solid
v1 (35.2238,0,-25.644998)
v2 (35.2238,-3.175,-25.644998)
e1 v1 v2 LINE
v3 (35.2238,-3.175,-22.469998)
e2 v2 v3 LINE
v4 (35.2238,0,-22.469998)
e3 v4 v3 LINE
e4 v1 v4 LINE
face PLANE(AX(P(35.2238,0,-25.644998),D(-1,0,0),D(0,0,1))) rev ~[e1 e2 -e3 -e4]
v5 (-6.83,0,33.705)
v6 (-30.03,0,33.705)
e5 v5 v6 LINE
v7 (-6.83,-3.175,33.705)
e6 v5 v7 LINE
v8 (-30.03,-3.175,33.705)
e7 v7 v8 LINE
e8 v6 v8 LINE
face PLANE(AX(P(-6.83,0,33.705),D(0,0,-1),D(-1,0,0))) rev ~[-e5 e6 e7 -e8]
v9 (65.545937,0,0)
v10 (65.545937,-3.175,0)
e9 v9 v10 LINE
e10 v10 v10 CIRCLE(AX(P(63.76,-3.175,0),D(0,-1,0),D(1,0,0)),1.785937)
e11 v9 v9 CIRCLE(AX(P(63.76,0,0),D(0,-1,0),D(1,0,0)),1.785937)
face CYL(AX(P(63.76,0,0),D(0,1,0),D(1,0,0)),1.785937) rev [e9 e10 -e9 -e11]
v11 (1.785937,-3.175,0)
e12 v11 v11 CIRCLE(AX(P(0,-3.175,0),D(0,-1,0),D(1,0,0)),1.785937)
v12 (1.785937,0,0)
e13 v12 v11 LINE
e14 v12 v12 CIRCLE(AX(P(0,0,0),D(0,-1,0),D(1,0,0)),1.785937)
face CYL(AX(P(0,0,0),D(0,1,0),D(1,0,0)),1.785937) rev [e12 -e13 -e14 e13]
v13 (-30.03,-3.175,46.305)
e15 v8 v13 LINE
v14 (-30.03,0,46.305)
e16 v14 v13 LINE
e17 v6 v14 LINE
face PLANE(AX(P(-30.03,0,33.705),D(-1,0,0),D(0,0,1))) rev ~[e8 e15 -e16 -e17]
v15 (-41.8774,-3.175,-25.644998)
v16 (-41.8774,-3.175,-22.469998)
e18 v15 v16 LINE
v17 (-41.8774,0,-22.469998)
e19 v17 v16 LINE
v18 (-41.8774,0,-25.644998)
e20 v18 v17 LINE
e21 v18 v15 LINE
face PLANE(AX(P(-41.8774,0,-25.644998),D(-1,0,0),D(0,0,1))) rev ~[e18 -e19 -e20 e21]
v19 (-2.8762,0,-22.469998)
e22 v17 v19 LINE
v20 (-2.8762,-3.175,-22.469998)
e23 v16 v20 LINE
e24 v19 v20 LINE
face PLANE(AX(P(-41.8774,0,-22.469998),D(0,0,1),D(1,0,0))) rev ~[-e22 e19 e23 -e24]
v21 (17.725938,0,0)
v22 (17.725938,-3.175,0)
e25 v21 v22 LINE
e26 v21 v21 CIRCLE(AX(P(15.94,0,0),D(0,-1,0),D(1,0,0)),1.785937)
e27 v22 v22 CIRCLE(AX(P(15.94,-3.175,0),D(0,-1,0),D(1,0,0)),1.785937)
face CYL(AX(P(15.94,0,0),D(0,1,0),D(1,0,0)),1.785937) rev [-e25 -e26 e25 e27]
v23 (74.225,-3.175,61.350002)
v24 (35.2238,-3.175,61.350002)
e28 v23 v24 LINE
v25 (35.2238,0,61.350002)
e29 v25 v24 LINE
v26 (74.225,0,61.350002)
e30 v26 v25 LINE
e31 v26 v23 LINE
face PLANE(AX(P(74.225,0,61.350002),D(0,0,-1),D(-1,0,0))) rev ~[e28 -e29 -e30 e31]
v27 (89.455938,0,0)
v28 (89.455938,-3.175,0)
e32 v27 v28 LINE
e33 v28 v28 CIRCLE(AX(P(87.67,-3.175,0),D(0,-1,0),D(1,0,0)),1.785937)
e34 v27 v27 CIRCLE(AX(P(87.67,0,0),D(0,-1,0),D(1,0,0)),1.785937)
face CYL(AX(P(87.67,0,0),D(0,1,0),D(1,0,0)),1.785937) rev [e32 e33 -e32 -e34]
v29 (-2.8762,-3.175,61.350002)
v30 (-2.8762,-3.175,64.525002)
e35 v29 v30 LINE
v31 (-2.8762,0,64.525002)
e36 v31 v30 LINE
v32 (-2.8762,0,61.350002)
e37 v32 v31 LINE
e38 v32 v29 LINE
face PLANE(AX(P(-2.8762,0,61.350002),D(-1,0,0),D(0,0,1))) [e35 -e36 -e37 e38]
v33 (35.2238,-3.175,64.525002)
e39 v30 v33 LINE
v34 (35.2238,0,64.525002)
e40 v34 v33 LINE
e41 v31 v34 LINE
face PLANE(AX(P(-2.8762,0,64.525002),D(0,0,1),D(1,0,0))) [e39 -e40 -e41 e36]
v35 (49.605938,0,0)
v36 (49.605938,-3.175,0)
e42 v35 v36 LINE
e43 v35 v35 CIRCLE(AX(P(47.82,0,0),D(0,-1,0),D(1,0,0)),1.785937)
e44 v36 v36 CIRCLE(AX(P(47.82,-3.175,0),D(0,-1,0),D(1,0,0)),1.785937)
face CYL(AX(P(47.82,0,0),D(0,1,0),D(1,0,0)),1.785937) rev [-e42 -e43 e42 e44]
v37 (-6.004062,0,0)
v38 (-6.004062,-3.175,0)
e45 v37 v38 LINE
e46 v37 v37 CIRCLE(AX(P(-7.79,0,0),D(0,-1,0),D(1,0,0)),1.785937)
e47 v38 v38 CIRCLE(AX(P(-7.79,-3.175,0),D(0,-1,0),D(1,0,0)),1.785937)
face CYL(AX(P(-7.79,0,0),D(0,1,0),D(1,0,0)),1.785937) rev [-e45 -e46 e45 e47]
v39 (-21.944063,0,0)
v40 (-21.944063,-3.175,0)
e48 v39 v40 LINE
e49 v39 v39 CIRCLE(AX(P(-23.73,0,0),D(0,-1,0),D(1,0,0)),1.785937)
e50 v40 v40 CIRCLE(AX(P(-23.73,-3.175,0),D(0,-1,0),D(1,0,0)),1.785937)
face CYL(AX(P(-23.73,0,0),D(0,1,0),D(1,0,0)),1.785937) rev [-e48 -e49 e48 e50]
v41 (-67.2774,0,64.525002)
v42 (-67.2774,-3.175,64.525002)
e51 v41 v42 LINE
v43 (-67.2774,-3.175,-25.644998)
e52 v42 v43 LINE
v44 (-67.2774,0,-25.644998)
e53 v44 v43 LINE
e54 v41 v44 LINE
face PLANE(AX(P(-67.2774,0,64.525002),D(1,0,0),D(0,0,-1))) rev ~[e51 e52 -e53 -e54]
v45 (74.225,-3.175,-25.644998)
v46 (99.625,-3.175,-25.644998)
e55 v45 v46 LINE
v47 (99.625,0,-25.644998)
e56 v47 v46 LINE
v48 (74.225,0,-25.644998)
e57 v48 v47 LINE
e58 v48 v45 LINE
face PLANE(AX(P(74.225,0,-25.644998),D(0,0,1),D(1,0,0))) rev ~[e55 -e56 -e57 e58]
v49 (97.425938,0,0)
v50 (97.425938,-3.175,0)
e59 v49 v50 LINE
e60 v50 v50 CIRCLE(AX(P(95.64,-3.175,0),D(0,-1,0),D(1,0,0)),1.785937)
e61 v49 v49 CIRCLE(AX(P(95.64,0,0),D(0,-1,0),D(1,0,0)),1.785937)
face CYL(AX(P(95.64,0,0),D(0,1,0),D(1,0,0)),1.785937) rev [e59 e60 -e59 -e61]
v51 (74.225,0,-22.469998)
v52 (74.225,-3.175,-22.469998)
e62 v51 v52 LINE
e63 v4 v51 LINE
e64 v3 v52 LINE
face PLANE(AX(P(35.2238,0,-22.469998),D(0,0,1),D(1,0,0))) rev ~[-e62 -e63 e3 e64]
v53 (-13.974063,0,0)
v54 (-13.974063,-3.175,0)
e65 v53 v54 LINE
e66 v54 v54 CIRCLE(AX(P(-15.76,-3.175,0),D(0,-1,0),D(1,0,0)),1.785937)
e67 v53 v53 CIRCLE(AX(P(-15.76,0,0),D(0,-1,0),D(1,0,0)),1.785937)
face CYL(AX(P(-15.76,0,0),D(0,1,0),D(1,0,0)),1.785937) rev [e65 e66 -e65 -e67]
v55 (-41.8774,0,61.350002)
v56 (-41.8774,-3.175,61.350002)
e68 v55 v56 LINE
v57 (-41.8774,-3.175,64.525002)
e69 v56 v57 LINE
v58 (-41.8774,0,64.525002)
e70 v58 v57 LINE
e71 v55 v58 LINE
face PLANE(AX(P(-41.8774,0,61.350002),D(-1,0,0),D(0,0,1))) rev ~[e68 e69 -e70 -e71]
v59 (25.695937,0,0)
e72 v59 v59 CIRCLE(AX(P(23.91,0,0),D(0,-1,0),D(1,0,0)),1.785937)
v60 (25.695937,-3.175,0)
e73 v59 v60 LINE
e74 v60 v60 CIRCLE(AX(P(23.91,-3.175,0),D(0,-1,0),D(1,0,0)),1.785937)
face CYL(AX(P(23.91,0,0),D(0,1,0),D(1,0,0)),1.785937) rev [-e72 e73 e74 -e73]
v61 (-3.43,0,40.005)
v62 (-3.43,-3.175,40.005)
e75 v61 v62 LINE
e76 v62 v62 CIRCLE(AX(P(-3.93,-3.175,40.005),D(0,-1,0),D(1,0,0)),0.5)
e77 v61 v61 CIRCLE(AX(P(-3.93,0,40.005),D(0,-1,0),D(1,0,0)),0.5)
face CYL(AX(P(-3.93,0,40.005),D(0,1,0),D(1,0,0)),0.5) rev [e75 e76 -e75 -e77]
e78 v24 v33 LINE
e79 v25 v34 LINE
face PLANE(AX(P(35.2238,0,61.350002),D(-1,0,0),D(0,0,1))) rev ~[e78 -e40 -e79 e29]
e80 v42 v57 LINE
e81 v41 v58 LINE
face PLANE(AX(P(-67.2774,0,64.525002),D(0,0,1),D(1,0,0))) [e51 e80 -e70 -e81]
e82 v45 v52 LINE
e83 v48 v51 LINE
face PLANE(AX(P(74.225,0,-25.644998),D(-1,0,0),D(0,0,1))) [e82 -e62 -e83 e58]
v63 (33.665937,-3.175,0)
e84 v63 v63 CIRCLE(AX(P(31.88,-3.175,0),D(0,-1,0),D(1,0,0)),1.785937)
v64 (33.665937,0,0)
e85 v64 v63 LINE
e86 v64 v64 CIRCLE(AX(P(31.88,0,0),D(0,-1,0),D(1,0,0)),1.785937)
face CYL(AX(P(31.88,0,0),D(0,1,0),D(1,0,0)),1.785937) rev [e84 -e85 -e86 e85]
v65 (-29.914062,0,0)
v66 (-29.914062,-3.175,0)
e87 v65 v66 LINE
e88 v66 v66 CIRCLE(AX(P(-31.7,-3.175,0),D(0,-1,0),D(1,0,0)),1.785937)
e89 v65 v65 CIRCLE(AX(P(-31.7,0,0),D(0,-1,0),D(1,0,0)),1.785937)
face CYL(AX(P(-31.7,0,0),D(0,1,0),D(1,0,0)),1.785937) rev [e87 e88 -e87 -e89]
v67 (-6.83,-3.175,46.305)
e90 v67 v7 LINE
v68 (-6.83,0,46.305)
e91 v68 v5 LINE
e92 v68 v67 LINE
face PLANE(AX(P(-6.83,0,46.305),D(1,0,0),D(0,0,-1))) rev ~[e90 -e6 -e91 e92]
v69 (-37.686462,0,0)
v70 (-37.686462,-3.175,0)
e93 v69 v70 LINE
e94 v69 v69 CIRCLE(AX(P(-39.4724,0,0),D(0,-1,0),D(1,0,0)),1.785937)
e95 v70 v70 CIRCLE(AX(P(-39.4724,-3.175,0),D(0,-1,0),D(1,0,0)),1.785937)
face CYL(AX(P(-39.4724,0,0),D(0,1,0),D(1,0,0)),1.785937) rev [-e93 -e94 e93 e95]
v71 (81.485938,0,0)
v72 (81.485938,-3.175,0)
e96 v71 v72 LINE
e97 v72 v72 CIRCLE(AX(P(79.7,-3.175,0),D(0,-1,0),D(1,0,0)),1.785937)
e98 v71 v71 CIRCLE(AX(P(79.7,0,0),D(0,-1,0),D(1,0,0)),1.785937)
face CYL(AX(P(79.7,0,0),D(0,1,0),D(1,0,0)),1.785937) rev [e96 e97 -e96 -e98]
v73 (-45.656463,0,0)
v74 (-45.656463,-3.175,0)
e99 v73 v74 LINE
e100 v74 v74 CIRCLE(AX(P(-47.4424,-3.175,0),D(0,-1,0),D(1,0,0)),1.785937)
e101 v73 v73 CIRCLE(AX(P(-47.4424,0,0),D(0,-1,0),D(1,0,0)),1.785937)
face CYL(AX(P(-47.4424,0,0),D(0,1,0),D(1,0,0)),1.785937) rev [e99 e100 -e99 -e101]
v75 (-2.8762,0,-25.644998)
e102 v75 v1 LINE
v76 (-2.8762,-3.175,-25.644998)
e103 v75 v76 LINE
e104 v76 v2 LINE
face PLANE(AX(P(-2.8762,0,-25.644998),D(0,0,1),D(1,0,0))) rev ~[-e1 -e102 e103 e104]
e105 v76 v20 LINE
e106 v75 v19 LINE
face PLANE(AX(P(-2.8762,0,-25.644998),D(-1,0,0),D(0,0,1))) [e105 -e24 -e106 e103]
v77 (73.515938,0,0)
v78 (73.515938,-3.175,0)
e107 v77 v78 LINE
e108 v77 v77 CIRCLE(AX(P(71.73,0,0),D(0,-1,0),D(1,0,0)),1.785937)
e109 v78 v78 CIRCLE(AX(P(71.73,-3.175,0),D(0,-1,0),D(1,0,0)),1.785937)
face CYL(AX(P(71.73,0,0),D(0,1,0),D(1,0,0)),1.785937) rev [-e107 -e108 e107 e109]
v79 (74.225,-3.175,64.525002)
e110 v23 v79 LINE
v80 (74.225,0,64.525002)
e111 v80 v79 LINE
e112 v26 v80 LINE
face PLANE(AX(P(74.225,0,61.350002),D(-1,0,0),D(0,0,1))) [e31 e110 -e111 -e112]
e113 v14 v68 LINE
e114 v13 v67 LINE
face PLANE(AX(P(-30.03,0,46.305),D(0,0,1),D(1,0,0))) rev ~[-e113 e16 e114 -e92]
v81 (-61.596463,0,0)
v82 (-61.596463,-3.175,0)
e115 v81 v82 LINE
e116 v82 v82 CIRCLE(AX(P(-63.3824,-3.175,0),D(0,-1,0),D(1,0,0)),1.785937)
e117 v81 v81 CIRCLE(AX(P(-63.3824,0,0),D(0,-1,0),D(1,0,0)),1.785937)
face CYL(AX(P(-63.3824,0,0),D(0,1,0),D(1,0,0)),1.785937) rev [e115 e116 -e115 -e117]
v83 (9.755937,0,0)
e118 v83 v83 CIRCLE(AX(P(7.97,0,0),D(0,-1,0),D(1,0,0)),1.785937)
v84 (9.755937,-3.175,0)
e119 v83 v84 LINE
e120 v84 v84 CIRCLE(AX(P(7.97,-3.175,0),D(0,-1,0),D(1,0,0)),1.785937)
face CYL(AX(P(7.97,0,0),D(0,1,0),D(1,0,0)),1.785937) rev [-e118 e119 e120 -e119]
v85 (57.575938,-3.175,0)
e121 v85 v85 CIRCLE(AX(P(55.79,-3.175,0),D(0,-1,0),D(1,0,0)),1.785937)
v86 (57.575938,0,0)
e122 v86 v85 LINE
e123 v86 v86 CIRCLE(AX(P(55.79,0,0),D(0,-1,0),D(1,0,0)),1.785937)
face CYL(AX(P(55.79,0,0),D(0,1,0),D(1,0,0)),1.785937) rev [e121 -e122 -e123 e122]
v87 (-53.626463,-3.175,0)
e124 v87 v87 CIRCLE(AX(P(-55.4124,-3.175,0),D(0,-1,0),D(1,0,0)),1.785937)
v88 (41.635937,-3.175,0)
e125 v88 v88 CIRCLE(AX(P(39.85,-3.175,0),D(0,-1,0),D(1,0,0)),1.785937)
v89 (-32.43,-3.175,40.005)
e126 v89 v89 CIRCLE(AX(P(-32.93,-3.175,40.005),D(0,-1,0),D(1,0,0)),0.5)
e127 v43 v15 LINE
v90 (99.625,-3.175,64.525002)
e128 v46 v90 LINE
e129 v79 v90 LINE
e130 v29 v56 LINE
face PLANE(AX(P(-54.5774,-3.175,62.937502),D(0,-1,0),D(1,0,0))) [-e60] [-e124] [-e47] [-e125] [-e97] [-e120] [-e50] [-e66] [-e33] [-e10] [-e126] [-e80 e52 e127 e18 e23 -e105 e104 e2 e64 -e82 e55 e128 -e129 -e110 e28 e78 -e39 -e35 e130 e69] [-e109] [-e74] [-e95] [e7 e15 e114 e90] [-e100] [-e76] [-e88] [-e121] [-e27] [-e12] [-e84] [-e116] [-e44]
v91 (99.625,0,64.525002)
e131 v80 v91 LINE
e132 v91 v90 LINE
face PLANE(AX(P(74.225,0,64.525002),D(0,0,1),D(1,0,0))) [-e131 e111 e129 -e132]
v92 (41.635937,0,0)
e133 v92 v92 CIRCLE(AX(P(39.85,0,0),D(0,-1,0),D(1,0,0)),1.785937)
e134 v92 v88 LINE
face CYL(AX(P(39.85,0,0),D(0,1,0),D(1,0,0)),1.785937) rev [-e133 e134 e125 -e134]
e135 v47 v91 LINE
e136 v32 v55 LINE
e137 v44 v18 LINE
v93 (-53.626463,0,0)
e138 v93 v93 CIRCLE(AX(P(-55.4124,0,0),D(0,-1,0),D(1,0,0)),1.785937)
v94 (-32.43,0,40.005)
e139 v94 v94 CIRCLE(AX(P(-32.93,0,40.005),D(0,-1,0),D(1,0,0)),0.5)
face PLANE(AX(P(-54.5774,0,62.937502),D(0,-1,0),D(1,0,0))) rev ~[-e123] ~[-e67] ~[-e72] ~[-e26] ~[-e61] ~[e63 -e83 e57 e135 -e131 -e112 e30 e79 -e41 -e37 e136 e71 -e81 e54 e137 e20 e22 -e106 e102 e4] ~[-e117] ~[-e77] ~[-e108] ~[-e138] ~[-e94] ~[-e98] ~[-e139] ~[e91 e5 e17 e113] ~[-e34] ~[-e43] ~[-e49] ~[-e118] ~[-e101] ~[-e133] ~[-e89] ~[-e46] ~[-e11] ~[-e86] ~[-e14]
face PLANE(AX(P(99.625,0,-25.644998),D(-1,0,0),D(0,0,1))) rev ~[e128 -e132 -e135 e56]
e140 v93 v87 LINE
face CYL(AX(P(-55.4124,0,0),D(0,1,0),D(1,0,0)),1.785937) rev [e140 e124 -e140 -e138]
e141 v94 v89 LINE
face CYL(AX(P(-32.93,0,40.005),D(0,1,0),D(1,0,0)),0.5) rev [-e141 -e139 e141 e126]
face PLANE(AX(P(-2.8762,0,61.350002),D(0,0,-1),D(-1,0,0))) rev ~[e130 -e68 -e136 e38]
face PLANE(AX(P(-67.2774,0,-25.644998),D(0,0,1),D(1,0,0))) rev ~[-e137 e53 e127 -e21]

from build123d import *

# Parameters (mm, degrees)
F0_W     = 25.4
F0_H     = 3.175
F0_W_2   = 38.1
F0_R     = 1.7859375
F0_R_2   = 0.5
F1_DEPTH = 3.175


# Not quite as in the source:
# - a length typed as a fraction of an inch, garbled in the dataset ("3 / 203.2 mm" for 3/8 in), is restored


with BuildPart() as f1:
    # F0 (on Front) → F1 (new body)
    with BuildSketch(Plane.XZ):
        with Locations((-54.5774, 62.9375024)):
            Rectangle(F0_W, F0_H)
        with Locations((16.1738, 62.9375024)):
            Rectangle(F0_W_2, F0_H)
        with Locations((86.925, 62.9375024)):
            Rectangle(F0_W, F0_H)
        with Locations((86.925, -24.0574976)):
            Rectangle(F0_W, F0_H)
        with Locations((16.1738, -24.0574976)):
            Rectangle(F0_W_2, F0_H)
        with Locations((-54.5774, -24.0574976)):
            Rectangle(F0_W, F0_H)
        Polygon((-67.2774, 61.1329712169), (-67.2774, -22.4699976), (-41.8774, -22.4699976), (-2.8762, -22.4699976), (35.2238, -22.4699976), (74.225, -22.4699976), (99.625, -22.4699976), (99.625, 61.3500024), (74.225, 61.3500024), (35.2238, 61.3500024), (-2.8762, 61.3500024), (-41.8774, 61.3500024), (-67.2774, 61.3500024), align=None)
        with Locations((-63.3824, 0)):
            Circle(F0_R, mode=Mode.SUBTRACT)
        with Locations((-55.4124, 0)):
            Circle(F0_R, mode=Mode.SUBTRACT)
        with Locations((-47.4424, 0)):
            Circle(F0_R, mode=Mode.SUBTRACT)
        with Locations((-39.4724, 0)):
            Circle(F0_R, mode=Mode.SUBTRACT)
        with Locations((-31.7, 0)):
            Circle(F0_R, mode=Mode.SUBTRACT)
        with Locations((-23.73, 0)):
            Circle(F0_R, mode=Mode.SUBTRACT)
        with Locations((-15.76, 0)):
            Circle(F0_R, mode=Mode.SUBTRACT)
        with Locations((-7.79, 0)):
            Circle(F0_R, mode=Mode.SUBTRACT)
        Circle(F0_R, mode=Mode.SUBTRACT)
        with Locations((7.97, 0)):
            Circle(F0_R, mode=Mode.SUBTRACT)
        with Locations((15.94, 0)):
            Circle(F0_R, mode=Mode.SUBTRACT)
        with Locations((23.91, 0)):
            Circle(F0_R, mode=Mode.SUBTRACT)
        with Locations((31.88, 0)):
            Circle(F0_R, mode=Mode.SUBTRACT)
        with Locations((39.85, 0)):
            Circle(F0_R, mode=Mode.SUBTRACT)
        with Locations((47.82, 0)):
            Circle(F0_R, mode=Mode.SUBTRACT)
        with Locations((55.79, 0)):
            Circle(F0_R, mode=Mode.SUBTRACT)
        with Locations((63.76, 0)):
            Circle(F0_R, mode=Mode.SUBTRACT)
        with Locations((71.73, 0)):
            Circle(F0_R, mode=Mode.SUBTRACT)
        with Locations((79.7, 0)):
            Circle(F0_R, mode=Mode.SUBTRACT)
        with Locations((87.67, 0)):
            Circle(F0_R, mode=Mode.SUBTRACT)
        with Locations((95.64, 0)):
            Circle(F0_R, mode=Mode.SUBTRACT)
        with Locations((-32.93, 40.005)):
            Circle(F0_R_2, mode=Mode.SUBTRACT)
        Polygon((-30.03, 33.705), (-30.03, 46.305), (-18.43, 46.305), (-6.83, 46.305), (-6.83, 33.705), (-18.43, 33.705), align=None, mode=Mode.SUBTRACT)
        with Locations((-3.93, 40.005)):
            Circle(F0_R_2, mode=Mode.SUBTRACT)
    extrude(amount=F1_DEPTH)


solid = f1.part
